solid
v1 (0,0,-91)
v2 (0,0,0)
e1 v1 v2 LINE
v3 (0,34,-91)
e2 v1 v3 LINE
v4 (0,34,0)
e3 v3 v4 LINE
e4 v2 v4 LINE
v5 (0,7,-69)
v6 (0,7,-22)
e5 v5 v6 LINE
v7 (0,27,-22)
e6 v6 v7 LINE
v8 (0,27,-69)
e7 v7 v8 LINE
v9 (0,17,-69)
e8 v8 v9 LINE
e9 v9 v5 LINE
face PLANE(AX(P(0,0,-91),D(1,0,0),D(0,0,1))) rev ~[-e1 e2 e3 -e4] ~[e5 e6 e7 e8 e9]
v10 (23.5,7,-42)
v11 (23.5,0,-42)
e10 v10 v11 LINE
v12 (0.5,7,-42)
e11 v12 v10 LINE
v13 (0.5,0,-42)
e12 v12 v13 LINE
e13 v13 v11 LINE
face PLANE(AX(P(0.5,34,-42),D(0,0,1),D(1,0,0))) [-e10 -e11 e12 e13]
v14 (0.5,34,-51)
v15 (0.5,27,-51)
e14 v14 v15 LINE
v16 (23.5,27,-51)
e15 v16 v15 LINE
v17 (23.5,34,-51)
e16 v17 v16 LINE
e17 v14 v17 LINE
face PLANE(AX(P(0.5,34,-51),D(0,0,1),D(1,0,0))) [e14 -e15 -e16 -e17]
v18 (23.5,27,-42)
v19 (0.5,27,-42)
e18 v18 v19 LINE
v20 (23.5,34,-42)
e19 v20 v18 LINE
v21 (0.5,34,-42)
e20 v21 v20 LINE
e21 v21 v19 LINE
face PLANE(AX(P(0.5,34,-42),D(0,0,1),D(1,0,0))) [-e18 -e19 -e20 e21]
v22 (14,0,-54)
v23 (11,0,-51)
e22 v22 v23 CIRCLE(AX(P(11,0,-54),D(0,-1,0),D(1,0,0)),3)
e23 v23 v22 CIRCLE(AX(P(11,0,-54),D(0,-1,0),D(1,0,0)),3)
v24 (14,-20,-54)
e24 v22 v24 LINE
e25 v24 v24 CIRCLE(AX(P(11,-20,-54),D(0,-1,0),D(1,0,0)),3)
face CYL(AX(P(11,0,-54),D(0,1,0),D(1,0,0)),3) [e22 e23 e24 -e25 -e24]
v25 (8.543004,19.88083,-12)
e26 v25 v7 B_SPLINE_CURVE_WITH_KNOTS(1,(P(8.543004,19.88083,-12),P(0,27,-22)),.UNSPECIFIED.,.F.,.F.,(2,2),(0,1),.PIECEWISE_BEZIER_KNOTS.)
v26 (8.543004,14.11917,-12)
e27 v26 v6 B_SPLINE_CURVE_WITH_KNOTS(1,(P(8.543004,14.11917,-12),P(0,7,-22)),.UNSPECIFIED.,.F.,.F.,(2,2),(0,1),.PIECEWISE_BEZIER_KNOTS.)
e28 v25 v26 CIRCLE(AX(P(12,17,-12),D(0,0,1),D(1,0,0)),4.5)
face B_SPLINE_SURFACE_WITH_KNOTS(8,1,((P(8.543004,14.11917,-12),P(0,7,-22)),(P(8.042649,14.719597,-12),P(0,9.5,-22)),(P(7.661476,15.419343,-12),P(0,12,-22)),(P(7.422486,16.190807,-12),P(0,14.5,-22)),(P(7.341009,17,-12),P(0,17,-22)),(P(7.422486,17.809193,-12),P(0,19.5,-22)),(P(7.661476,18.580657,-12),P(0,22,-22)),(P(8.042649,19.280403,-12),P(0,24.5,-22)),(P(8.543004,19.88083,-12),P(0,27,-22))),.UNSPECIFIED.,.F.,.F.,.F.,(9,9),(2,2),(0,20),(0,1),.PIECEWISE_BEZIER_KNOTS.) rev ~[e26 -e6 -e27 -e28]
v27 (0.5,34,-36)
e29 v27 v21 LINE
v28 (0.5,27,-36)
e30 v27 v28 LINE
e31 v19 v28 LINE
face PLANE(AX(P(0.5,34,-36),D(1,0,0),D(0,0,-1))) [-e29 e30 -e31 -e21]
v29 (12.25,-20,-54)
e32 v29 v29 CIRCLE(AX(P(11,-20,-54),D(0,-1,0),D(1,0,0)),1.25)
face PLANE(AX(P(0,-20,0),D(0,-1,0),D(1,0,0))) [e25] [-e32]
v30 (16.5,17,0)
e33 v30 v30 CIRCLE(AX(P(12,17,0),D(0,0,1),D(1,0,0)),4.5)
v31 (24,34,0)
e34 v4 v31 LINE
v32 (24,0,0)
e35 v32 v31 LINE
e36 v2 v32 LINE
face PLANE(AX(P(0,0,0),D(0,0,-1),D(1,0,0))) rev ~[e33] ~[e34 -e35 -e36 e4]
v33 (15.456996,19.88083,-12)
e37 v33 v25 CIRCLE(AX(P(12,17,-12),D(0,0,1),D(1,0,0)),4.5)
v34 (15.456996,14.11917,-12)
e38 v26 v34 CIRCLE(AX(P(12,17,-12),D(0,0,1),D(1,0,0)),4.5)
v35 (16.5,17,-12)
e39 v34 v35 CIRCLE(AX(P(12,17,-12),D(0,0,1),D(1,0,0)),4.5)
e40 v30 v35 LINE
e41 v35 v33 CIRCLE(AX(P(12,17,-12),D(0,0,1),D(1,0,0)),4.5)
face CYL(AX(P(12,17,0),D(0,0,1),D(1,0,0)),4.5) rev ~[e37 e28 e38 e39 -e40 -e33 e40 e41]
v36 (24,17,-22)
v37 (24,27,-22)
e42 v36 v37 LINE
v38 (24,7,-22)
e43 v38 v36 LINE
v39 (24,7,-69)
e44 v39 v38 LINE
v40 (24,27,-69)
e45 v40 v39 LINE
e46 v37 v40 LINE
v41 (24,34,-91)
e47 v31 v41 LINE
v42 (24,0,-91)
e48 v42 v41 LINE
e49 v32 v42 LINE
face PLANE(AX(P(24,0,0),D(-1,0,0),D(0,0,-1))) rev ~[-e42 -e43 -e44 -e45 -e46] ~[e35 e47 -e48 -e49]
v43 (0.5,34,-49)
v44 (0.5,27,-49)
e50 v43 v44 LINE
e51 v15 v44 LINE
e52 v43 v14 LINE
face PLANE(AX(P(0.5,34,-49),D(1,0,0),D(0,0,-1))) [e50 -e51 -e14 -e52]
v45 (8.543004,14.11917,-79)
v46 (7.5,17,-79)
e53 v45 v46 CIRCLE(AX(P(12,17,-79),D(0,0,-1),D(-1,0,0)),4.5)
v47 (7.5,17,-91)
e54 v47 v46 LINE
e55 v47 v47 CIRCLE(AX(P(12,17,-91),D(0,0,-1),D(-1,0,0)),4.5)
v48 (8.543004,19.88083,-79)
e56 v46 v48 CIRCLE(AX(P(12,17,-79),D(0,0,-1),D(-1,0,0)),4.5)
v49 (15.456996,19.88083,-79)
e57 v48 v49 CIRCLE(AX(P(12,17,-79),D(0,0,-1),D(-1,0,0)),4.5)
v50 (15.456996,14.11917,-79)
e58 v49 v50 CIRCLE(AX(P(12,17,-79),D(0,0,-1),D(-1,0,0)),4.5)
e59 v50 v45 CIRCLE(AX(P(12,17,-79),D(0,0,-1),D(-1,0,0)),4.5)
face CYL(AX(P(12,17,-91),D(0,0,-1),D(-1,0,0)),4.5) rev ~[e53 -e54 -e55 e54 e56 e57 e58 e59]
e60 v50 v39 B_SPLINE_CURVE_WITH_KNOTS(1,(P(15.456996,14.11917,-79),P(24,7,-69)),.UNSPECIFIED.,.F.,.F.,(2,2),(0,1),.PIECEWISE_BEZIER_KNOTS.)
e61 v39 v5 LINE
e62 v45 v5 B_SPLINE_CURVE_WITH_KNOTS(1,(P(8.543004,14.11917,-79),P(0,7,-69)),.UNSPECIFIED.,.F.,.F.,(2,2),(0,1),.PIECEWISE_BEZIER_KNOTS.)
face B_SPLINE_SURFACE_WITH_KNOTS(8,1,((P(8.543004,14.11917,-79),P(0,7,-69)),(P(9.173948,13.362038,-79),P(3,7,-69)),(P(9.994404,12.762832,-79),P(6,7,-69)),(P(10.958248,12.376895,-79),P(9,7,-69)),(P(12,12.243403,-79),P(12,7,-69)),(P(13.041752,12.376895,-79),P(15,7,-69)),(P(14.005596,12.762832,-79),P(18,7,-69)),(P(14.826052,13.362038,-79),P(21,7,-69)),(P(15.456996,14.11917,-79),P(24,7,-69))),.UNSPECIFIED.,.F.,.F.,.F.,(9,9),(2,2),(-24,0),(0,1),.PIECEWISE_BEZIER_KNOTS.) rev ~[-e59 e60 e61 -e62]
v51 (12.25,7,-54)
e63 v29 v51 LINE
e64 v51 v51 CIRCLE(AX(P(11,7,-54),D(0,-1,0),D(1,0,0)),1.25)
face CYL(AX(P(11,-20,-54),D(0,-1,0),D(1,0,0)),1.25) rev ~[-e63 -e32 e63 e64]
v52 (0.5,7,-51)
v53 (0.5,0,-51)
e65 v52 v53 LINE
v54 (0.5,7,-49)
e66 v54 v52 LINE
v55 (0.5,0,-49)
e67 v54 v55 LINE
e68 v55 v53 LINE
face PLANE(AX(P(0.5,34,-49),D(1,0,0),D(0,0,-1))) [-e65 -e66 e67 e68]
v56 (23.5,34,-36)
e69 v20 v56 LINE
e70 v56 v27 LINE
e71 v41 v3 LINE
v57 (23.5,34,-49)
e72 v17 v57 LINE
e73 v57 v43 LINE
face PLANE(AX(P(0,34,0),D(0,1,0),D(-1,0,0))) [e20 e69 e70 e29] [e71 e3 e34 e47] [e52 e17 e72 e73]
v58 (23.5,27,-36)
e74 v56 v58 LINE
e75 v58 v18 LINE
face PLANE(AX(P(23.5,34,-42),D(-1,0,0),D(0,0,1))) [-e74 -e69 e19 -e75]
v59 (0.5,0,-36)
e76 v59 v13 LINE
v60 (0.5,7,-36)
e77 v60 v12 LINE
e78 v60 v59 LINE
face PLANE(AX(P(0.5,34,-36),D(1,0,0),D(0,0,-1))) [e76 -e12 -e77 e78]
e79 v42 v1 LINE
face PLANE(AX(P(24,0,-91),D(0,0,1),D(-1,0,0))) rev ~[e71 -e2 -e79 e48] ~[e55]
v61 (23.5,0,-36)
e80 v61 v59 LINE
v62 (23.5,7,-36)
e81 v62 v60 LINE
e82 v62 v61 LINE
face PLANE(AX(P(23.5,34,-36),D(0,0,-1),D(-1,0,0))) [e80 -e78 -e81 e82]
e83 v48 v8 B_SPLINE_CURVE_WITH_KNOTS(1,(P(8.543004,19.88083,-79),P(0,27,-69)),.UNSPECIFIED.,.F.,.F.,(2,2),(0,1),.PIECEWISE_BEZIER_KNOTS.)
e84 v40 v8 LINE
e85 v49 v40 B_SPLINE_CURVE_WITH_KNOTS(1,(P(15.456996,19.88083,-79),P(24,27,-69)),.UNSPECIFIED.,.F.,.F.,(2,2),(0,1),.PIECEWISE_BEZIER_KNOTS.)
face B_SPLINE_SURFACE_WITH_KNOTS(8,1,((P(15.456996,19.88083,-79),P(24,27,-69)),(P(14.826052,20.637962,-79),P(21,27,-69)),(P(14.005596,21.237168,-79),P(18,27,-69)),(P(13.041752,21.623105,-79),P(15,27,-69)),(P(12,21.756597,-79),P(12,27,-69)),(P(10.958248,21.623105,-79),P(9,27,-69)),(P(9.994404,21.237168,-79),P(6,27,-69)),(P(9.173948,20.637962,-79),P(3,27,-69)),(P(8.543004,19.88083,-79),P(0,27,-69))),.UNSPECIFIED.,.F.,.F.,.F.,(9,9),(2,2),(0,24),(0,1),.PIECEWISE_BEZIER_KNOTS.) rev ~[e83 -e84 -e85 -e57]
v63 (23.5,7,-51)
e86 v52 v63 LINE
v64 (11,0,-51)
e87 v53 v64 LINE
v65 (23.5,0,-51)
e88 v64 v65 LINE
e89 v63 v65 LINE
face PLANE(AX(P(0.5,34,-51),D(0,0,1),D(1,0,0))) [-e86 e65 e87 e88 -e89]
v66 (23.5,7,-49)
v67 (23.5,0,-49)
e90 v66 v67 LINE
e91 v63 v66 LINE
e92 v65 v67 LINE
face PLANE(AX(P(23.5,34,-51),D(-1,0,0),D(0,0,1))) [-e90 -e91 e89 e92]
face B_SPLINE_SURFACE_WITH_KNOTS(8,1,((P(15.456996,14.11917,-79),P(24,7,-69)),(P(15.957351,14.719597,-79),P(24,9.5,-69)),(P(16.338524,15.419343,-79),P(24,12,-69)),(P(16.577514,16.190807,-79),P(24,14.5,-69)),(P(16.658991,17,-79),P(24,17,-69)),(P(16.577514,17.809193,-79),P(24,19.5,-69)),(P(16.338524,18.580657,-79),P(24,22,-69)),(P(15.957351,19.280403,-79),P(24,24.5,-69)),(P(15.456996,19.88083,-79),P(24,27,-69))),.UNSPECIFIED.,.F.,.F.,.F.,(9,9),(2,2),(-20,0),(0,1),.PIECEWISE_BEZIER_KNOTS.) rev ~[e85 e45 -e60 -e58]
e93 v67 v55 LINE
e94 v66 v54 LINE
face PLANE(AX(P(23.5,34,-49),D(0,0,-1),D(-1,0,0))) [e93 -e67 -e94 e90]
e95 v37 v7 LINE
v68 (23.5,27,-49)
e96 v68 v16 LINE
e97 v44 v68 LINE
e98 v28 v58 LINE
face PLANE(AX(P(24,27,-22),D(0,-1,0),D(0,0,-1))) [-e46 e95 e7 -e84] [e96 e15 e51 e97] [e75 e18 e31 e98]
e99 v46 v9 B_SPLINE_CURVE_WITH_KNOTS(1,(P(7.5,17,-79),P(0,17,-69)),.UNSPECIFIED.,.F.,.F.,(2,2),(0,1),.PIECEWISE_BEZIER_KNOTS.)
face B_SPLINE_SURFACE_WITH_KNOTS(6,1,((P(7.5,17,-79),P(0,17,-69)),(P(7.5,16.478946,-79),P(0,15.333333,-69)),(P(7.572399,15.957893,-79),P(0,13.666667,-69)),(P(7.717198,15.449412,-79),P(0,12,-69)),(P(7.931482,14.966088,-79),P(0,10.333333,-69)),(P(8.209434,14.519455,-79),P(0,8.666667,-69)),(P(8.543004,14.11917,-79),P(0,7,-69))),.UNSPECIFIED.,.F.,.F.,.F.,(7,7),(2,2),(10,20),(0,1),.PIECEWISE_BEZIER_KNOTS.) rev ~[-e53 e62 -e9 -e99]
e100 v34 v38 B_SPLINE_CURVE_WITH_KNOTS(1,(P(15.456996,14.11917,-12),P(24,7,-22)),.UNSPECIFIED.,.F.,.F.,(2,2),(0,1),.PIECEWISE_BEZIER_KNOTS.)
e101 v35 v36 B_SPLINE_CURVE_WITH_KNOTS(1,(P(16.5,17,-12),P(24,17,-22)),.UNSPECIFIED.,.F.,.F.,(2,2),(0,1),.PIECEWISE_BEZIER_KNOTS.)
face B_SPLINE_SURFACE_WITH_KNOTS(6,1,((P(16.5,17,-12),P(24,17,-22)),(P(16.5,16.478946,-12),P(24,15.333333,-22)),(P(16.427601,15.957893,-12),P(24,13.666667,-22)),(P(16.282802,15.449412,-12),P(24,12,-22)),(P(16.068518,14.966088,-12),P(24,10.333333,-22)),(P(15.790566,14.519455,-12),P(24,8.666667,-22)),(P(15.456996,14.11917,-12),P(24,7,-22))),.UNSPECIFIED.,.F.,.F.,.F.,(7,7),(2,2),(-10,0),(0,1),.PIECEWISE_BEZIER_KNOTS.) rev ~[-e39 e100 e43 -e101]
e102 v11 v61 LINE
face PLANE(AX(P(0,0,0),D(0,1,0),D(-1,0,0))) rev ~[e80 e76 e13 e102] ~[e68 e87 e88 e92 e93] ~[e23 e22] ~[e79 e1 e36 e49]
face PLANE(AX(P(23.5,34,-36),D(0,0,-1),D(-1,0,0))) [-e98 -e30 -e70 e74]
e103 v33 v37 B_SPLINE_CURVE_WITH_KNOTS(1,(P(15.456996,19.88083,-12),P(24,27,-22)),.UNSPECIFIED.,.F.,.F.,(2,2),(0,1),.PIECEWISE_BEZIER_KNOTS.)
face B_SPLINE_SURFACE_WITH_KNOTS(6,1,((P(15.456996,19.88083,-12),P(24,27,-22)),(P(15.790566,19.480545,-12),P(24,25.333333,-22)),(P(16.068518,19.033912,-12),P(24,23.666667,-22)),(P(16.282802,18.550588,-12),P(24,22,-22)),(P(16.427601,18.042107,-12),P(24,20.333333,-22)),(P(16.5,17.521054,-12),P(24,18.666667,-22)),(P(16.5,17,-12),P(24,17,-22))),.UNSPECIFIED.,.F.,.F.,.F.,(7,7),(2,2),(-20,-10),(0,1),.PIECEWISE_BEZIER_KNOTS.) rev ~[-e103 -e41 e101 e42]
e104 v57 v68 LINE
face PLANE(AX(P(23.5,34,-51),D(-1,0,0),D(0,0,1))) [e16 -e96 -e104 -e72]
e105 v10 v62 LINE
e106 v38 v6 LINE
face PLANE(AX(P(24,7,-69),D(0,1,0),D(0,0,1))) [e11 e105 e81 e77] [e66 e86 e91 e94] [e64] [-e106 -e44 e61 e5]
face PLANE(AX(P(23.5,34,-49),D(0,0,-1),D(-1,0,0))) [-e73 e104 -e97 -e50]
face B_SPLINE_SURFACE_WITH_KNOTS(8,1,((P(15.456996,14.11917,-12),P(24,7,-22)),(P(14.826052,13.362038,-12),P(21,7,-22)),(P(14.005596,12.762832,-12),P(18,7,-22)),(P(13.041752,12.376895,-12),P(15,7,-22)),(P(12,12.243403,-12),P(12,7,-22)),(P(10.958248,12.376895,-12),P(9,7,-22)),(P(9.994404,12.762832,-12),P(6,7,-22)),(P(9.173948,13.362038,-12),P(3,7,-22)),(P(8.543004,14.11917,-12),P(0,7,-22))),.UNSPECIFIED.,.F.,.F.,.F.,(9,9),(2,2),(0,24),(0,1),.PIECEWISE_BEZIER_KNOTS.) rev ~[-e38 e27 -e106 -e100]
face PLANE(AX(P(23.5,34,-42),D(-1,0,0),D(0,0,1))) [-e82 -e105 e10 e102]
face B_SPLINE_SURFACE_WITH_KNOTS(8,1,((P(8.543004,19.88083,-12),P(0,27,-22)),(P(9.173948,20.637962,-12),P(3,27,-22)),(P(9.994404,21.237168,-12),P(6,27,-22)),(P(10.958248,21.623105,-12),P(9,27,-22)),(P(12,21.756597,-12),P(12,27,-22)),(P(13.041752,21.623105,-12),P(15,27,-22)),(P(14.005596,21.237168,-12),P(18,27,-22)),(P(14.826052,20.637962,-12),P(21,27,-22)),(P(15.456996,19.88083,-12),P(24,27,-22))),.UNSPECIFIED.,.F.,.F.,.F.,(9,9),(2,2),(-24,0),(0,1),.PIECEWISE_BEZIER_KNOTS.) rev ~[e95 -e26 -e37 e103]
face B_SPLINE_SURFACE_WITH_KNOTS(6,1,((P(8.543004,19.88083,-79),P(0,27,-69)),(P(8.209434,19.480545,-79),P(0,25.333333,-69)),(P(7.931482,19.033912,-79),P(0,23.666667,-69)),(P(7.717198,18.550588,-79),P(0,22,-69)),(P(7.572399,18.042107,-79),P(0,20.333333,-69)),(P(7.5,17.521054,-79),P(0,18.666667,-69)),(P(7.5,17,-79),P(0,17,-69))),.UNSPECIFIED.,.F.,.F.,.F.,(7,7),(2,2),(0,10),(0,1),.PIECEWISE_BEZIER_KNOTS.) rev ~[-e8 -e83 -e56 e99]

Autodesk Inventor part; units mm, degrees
ref_plane "YZ Plane" through (0, 0, 0) normal (1, 0, 0) x (0, 1, 0)
ref_plane "XZ Plane" through (0, 0, 0) normal (0, 1, 0) x (-1, 0, 0)
ref_plane "XY Plane" through (0, 0, 0) normal (0, 0, 1) x (1, 0, 0)
sketch "Sketch1" plane through (0, 0, 0) normal (0, 1, 0) x (-1, 0, 0)
  line L0 (0, 0) -> (-24, 0)
  line L1 (-24, 0) -> (-24, -91)
  line L2 (-24, -91) -> (0, -91)
  line L3 (0, -91) -> (0, 0)
  dimension "d0" = 91
  dimension "d1" = 24
extrude "Extrusion1" add sketch "Sketch1" along normal blind 34
sketch "Sketch2" plane through (24, 0, 0) normal (1, 0, 0) x (0, 0, -1)
  line L0 (22, 27) -> (69, 27)
  line L1 (69, 27) -> (69, 7)
  line L2 (69, 7) -> (22, 7)
  line L3 (22, 7) -> (22, 27)
  line L4 (0, 34) -> (91, 34) projected
  line L5 (0, 0) -> (91, 0) projected
  line L6 (0, 0) -> (0, 34) projected
  line L7 (91, 0) -> (91, 34) projected
  dimension "d4" = 7
  dimension "d5" = 7
  dimension "d6" = 22
  dimension "d7" = 22
extrude "Extrusion2" cut sketch "Sketch2" against normal up to surface (24 mm away) contours L0 L1 L2 L3
sketch "Sketch3" plane through (0, 34, 0) normal (0, 1, 0) x (1, 0, 0)
  line L0 (0.5, 42) -> (23.5, 42)
  line L1 (23.5, 42) -> (23.5, 36)
  line L2 (23.5, 36) -> (0.5, 36)
  line L3 (0.5, 36) -> (0.5, 42)
  line L4 (0, 91) -> (0, 0) projected
  line L5 (24, 0) -> (24, 91) projected
  line L6 (0, 0) -> (24, 0) projected
  dimension "d10" = 0.5
  dimension "d11" = 0.5
  dimension "d12" = 6
  dimension "d13" = 36
extrude "Extrusion3" cut sketch "Sketch3" against normal up to surface (34 mm away)
sketch "Sketch4" plane through (0, 34, 0) normal (0, 1, 0) x (1, 0, 0)
  line L0 (0.5, 51) -> (23.5, 51)
  line L1 (23.5, 51) -> (23.5, 49)
  line L2 (23.5, 49) -> (0.5, 49)
  line L3 (0.5, 49) -> (0.5, 51)
  line L4 (0.5, 42) -> (23.5, 42) projected
  line L5 (24, 0) -> (24, 91) projected
  line L6 (0, 91) -> (0, 0) projected
  dimension "d16" = 2
  dimension "d17" = 7
  dimension "d18" = 0.5
  dimension "d19" = 0.5
extrude "Extrusion4" cut sketch "Sketch4" against normal up to surface (34 mm away)
sketch "Sketch5" plane through (0, 0, 0) normal (0, 0, 1) x (1, 0, 0)
  circle A0 centre (12, 17) radius 4.5
  line L0 (0, 0) -> (24, 0) projected
  line L1 (24, 0) -> (24, 34) projected
  dimension "d22" = 17
  dimension "d23" = 12
  dimension "d24" = 9
extrude "Extrusion5" cut sketch "Sketch5" against normal blind 12
loft "Loft1" cut section 1 edges at (7.5, 17, -12) section 2 edges at (0, 17, -22) (12, 27, -22) (24, 17, -22) (12, 7, -22)
sketch "Sketch6" plane through (24, 0, -91) normal (0, 0, -1) x (-1, 0, 0)
  circle A0 centre (12, 17) radius 4.5
  line L0 (24, 0) -> (24, 34) projected
  line L1 (0, 0) -> (24, 0) projected
  dimension "d31" = 12
  dimension "d32" = 17
  dimension "d33" = 9
extrude "Extrusion6" cut sketch "Sketch6" against normal blind 12
loft "Loft2" cut section 1 edges at (16.5, 17, -79) section 2 edges at (0, 17, -69) (12, 7, -69) (24, 17, -69) (12, 27, -69)
sketch "Sketch7" plane through (0, 0, 0) normal (0, -1, 0) x (1, 0, 0)
  circle A0 centre (11, -54) radius 3
  line L0 (23.5, -42) -> (0.5, -42) projected
  line L1 (24, 0) -> (24, -91) projected
  line L2 (0, -91) -> (0, 0) projected
  dimension "d40" = 12
  dimension "d41" = 13
  dimension "d42" = 11
  dimension "d43" = 6
extrude "Extrusion7" add sketch "Sketch7" along normal blind 20
sketch "Sketch8" plane through (11, -20, -54) normal (0, -1, 0) x (1, 0, 0)
  circle A0 centre (0, 0) radius 1.25
  point P0 (-11, 54)
  dimension "d46" = 2.5
extrude "Extrusion8" cut sketch "Sketch8" against normal up to surface (27 mm away)
properties part number "20220727_1cell_PBME"
